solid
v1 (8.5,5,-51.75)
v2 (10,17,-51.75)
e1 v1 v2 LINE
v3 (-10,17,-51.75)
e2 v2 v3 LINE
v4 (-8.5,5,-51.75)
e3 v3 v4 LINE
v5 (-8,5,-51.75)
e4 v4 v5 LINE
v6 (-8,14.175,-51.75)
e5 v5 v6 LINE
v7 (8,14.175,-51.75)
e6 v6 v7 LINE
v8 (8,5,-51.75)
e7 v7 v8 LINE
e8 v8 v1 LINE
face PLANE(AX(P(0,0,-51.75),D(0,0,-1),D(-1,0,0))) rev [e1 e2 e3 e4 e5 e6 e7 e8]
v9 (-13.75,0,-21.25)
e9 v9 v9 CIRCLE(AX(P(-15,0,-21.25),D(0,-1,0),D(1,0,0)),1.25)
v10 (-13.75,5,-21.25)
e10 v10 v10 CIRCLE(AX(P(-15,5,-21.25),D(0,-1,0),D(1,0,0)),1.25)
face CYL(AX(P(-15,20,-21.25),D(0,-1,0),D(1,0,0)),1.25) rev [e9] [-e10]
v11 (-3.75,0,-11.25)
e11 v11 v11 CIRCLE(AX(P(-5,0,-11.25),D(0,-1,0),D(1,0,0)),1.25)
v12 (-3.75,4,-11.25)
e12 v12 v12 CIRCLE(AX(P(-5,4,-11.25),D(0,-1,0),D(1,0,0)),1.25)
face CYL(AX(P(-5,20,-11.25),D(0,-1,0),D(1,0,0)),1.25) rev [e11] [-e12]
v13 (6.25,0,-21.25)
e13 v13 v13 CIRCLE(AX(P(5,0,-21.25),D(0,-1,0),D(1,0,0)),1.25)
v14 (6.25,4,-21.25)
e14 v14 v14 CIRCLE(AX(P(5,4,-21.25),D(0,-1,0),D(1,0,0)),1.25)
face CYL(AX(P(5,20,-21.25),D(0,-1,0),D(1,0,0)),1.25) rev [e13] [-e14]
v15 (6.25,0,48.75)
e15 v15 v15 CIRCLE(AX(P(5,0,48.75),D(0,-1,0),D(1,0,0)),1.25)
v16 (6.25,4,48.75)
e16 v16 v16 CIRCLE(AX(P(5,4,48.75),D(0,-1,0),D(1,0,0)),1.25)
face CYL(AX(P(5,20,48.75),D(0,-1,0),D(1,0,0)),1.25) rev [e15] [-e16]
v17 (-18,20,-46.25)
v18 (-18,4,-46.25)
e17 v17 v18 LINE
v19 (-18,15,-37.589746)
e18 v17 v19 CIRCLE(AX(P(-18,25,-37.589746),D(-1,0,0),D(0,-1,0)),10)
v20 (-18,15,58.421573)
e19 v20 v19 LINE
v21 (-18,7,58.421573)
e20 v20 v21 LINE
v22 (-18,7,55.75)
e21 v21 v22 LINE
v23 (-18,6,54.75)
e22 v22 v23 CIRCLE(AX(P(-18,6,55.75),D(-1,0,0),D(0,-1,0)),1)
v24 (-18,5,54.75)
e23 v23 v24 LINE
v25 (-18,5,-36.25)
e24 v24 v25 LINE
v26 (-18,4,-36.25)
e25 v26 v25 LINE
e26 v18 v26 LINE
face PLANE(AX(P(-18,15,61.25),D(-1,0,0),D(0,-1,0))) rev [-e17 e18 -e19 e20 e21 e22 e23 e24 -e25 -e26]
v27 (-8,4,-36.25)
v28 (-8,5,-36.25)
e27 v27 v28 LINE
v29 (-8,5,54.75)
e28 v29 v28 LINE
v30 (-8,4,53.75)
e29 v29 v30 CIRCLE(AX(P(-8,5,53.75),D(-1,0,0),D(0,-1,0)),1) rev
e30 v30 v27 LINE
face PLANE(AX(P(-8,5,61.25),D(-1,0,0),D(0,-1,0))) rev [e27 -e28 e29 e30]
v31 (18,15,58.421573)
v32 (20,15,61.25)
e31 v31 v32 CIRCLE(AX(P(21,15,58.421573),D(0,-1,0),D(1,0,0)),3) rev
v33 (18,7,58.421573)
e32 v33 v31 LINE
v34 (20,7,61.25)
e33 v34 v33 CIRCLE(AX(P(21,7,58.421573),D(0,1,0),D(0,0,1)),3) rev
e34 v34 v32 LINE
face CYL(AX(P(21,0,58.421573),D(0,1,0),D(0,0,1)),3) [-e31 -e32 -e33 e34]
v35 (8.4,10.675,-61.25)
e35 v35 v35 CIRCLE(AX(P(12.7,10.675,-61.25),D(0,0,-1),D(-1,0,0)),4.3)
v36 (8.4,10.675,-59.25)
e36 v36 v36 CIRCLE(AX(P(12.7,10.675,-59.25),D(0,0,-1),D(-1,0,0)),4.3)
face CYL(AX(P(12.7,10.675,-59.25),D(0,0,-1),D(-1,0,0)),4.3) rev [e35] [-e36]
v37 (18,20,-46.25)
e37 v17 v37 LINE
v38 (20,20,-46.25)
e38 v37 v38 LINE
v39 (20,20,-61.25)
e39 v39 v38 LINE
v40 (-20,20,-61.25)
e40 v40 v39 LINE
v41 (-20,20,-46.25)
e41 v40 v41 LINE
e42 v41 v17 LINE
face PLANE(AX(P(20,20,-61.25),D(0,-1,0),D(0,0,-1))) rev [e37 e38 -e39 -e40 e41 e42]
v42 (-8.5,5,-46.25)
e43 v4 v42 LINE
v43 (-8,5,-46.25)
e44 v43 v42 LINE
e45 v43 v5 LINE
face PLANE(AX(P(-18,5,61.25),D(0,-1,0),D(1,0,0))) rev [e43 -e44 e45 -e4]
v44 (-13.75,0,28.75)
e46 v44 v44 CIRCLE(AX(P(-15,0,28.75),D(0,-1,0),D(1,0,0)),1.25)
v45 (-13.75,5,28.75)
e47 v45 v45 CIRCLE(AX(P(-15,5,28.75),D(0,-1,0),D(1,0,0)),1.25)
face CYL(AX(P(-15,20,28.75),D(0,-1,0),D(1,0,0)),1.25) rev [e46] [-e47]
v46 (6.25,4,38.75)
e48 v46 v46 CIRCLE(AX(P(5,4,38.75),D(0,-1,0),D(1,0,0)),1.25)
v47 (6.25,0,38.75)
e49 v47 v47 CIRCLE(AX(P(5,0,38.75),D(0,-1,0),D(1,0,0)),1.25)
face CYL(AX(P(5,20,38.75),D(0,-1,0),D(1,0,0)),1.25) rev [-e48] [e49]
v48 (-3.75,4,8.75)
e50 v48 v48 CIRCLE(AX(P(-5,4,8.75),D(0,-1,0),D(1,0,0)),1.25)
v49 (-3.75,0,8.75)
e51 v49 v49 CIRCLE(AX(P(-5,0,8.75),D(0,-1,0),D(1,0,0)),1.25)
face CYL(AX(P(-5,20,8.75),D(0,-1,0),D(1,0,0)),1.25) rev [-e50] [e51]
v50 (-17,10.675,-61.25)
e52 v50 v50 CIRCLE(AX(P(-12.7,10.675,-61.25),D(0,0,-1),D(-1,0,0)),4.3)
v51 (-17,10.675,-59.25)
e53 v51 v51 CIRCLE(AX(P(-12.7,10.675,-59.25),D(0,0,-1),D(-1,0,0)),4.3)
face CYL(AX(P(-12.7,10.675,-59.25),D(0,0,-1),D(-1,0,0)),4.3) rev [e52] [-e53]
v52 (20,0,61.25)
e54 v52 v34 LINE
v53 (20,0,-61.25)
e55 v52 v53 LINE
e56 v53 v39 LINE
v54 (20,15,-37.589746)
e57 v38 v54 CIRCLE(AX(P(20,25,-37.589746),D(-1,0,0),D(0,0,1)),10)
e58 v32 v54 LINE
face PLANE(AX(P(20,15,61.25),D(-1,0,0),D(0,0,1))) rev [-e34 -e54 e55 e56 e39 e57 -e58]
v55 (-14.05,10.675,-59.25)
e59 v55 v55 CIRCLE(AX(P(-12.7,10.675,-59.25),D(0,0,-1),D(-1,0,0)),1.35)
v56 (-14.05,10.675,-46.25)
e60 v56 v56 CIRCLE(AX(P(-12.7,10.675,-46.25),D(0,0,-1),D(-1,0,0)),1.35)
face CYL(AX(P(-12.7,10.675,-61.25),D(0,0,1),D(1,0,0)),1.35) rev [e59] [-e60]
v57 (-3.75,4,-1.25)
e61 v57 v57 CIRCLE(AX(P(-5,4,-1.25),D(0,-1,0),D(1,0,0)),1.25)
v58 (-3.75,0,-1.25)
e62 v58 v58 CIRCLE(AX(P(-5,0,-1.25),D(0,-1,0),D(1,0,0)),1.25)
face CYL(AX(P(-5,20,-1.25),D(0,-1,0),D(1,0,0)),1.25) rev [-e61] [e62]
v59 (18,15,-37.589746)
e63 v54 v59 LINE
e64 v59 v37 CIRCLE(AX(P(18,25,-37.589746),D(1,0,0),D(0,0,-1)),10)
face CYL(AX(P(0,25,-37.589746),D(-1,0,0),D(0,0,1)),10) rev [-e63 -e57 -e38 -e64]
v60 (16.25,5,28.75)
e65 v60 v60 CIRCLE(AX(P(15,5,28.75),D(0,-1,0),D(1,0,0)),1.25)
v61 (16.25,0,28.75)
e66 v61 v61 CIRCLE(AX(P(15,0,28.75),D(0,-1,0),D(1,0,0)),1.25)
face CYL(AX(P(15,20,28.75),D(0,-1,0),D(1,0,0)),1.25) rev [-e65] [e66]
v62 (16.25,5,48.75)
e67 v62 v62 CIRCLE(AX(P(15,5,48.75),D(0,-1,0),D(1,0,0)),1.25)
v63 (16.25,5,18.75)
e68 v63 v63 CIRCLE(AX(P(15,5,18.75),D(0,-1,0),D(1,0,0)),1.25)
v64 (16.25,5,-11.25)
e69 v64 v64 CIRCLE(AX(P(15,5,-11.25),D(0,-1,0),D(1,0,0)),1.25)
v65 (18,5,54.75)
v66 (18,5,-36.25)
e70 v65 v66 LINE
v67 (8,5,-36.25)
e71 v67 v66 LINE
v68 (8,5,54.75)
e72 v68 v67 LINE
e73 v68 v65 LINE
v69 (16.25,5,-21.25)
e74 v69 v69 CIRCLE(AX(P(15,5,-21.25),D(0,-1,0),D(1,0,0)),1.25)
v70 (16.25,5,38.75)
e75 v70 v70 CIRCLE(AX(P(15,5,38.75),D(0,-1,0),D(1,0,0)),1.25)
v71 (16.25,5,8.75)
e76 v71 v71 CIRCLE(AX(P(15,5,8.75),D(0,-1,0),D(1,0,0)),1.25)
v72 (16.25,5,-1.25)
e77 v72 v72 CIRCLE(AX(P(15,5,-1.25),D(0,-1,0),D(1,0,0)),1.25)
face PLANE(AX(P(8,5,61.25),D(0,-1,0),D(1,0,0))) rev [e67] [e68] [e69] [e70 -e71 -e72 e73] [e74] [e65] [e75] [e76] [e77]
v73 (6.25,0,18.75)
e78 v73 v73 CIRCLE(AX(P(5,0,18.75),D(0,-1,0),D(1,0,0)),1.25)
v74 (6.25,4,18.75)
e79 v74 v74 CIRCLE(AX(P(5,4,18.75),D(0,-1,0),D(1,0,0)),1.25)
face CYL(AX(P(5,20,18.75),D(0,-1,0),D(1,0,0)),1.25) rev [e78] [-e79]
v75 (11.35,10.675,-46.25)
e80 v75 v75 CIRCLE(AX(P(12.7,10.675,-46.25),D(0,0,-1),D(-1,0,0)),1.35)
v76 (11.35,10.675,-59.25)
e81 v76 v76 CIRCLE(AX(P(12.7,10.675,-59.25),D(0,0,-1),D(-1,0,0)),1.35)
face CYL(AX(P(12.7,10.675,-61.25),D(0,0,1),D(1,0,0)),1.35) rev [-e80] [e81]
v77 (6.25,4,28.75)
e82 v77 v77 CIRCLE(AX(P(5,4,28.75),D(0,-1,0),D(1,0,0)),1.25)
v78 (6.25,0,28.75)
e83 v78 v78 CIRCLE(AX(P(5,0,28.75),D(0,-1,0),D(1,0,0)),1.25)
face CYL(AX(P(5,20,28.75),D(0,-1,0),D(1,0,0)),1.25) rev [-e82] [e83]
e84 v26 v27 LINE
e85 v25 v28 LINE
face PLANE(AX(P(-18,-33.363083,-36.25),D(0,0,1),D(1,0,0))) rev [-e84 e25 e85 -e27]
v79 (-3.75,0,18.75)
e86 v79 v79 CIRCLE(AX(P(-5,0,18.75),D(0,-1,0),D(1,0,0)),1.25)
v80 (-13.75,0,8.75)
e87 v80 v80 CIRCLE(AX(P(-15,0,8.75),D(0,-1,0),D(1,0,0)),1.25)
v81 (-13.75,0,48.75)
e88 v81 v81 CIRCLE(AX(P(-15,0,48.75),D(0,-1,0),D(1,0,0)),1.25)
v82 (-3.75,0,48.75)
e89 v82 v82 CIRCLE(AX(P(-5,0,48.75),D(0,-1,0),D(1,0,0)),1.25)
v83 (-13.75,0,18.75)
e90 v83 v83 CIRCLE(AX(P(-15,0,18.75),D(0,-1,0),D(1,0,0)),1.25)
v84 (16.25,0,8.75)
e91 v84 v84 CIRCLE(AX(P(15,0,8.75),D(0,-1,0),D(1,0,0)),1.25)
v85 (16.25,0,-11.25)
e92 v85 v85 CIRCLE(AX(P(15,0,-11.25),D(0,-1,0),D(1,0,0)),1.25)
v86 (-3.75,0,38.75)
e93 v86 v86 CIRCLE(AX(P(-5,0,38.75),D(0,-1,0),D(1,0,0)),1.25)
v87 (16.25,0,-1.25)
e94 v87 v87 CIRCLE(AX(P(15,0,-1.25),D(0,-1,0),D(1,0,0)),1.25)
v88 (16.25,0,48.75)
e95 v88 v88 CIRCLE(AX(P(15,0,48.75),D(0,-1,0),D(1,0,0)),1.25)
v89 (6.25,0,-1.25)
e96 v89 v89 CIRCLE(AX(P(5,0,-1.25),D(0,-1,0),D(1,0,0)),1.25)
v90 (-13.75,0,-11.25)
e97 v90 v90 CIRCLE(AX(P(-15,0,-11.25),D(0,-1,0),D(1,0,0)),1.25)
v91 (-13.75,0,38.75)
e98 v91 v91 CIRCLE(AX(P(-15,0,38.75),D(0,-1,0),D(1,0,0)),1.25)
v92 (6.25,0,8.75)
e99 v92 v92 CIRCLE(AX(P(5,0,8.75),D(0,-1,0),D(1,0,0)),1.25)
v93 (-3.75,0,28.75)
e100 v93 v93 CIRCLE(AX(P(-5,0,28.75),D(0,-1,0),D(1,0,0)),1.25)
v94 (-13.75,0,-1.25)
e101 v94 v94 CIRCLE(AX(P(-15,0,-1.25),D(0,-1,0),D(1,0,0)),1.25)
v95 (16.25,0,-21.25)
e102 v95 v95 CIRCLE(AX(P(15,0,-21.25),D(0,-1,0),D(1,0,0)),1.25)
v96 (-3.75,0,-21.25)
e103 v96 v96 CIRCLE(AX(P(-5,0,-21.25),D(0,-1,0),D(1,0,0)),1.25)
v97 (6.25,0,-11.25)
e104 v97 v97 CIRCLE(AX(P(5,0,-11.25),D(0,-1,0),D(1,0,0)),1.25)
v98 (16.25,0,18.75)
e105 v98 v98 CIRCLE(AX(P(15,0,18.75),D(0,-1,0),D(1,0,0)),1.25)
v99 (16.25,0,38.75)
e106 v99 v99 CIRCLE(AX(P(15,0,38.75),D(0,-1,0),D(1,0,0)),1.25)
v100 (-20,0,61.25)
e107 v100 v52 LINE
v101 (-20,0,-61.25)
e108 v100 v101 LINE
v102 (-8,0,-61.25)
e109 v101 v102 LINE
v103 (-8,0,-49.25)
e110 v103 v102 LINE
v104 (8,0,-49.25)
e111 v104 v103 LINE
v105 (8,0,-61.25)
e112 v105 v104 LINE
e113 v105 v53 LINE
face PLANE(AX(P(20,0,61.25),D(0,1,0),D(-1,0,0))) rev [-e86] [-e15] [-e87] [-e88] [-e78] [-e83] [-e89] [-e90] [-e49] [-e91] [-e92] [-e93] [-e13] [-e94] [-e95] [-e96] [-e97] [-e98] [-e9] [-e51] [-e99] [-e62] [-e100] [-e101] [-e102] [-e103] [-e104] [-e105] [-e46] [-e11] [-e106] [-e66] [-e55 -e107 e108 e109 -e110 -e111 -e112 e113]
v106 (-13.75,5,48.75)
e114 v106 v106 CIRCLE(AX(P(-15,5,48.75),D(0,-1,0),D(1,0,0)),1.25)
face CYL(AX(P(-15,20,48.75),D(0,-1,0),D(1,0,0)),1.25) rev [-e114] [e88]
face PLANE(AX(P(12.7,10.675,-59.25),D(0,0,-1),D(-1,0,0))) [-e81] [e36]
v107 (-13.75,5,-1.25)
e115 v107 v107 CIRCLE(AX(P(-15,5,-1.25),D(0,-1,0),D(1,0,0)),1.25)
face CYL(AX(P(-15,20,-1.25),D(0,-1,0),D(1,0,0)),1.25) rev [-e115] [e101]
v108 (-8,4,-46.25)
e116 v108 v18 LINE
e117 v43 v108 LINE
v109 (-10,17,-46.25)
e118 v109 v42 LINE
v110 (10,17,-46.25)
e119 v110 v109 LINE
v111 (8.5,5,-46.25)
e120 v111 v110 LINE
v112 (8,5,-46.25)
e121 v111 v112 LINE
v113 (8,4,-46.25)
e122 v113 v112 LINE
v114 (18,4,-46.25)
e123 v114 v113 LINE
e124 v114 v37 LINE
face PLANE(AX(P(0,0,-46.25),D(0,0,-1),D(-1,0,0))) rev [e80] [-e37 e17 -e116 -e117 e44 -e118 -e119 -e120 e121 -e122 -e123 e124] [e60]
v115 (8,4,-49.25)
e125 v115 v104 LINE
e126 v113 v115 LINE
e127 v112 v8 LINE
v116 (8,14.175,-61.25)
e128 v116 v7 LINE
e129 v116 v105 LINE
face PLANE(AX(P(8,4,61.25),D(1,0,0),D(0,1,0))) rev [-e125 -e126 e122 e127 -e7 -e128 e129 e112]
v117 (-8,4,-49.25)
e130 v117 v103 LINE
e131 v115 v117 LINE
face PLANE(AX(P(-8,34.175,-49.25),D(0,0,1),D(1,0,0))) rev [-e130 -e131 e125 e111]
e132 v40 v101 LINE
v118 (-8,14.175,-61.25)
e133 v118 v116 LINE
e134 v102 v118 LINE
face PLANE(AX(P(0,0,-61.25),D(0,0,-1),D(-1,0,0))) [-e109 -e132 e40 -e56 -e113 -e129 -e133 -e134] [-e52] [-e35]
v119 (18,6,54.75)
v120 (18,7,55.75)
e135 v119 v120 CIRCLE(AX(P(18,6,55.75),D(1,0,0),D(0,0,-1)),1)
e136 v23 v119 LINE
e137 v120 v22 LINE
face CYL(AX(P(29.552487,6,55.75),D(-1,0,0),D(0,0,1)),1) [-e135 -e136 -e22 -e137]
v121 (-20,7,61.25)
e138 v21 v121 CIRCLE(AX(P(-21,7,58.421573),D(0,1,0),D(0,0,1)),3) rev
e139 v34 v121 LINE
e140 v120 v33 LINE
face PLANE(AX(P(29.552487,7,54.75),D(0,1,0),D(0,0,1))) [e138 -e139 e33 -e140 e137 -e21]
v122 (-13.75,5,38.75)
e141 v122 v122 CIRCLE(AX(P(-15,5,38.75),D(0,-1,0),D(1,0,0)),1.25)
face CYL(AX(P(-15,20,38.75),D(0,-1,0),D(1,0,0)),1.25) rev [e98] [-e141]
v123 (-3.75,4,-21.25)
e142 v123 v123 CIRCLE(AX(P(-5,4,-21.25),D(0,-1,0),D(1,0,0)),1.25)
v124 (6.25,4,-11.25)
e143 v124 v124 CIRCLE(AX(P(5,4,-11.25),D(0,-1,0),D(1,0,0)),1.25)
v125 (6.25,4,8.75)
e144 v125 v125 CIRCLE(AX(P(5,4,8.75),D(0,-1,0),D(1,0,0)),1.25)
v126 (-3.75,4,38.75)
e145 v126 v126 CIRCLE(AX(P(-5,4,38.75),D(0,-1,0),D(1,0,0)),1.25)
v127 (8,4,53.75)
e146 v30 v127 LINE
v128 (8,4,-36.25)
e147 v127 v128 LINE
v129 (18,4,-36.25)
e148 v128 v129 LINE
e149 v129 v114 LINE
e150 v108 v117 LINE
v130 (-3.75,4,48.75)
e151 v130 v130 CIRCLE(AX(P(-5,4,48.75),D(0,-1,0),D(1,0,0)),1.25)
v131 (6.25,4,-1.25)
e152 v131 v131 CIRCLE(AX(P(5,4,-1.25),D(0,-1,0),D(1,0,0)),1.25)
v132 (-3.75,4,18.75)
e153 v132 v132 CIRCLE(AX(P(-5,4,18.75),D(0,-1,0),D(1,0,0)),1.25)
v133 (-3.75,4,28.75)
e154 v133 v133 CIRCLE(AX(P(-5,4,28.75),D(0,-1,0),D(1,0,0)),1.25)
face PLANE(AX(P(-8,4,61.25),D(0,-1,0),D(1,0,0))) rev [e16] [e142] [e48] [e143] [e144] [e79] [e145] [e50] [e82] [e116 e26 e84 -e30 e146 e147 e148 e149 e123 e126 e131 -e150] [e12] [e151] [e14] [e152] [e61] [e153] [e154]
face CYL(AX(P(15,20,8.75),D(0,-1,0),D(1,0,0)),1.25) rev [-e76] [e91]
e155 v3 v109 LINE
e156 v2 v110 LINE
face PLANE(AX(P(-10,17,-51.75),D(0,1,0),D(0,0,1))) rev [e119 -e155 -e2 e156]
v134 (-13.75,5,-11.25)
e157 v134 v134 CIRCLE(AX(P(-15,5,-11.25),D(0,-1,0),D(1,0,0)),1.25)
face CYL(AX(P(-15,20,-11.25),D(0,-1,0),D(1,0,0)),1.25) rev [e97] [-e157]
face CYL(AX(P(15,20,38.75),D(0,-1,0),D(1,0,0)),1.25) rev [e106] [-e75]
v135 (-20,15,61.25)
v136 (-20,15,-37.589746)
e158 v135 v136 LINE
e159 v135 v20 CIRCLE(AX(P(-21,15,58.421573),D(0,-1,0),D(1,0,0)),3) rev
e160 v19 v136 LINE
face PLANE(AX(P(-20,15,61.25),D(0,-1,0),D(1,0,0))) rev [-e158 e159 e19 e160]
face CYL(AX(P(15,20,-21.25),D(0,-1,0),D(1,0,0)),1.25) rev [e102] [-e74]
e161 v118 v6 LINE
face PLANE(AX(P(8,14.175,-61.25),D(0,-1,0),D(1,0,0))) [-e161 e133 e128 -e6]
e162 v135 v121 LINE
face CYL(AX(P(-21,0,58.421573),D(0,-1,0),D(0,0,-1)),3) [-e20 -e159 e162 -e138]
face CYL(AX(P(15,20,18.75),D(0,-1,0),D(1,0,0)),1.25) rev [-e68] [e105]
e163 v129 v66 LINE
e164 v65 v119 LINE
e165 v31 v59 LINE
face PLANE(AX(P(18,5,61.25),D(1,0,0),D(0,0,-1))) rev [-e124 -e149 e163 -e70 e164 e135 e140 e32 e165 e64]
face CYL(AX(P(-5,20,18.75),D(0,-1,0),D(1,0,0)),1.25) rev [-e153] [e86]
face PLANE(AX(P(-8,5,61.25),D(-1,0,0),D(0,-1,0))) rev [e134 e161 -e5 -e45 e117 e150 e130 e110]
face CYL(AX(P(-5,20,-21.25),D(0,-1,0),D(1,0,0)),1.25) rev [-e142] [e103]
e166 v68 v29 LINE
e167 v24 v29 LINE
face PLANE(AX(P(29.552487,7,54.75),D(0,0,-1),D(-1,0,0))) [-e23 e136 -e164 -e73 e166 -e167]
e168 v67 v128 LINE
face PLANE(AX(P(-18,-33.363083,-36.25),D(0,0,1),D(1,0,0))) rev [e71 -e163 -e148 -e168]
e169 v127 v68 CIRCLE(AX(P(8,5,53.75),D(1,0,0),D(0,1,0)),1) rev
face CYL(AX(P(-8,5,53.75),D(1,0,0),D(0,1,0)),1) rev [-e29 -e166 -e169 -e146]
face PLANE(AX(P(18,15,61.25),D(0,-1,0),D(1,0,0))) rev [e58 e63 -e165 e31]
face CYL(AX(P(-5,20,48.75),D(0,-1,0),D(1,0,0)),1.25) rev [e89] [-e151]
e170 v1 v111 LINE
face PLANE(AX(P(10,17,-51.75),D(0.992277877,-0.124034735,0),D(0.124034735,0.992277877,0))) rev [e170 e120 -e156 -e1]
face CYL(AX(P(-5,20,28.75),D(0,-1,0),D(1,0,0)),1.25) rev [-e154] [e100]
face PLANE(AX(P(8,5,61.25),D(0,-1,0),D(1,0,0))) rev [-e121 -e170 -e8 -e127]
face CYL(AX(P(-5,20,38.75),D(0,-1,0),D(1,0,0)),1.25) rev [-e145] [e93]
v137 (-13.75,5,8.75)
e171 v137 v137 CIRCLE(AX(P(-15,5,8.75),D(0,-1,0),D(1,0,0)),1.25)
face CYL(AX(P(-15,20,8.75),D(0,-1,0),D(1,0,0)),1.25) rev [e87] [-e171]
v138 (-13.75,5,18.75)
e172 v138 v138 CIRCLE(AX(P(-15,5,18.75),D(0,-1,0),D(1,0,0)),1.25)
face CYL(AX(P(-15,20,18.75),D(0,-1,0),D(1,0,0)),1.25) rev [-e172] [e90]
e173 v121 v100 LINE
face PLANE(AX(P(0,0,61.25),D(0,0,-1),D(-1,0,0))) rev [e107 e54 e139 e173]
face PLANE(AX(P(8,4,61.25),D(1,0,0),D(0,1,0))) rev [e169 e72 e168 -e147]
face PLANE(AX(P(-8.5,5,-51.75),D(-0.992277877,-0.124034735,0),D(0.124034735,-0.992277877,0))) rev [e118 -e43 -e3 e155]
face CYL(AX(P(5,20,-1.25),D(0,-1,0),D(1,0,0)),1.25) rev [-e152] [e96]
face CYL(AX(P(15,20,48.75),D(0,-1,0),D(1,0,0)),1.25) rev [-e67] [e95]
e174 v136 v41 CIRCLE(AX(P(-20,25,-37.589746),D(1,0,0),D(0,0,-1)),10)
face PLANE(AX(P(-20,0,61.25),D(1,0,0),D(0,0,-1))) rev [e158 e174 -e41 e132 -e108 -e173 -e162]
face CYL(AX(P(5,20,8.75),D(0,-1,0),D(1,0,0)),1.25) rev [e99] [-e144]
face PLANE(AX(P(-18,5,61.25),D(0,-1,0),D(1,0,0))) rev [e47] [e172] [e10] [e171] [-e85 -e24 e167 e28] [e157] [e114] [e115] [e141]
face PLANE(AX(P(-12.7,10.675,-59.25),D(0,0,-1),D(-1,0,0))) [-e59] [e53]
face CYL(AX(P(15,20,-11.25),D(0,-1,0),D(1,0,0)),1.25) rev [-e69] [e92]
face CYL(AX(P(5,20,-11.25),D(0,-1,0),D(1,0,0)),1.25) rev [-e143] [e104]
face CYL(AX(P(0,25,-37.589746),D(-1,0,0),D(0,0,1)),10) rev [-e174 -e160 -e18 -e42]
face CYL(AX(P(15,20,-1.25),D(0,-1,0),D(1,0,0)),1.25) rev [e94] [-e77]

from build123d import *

# Parameters (mm, degrees)
MAIN_DEPTH                      = 61.25
FRONT_CONGE_R                   = 3
ESQUISSE11_W                    = 2
ESQUISSE11_H                    = 15
DSUB_EXTRUSION_ATTACHMENT_DEPTH = 15
ESQUISSE12_W                    = 40
ESQUISSE12_H                    = 15
ESQUISSE12_R                    = 1.35
ESQUISSE12_W_2                  = 16
ESQUISSE12_H_2                  = 7
DSUB_EXTRUSION_DEPTH            = 15
DSUB_FRONT_HOLE_DEPTH           = 5.5
ESQUISSE14_R                    = 4.3
BOTTOM_HOLE_DEPTH               = 2
SKETCH7_W                       = 36
SKETCH7_H                       = 10
DSUBBOTTOMHOLE_DEPTH            = 1
CONG_4_R                        = 10
BOTTOMSTOP_REACH                = 77.839
SKETCH4_W                       = 6.5
SKETCH4_H                       = 7
FILLET1_R                       = 1
SKETCH5_W                       = 16
SKETCH5_H                       = 12
CUT_EXTRUDE1_DEPTH              = 14.175
SKETCH6_R                       = 1.25
FIXHOLE_DEPTH                   = 68.465268843
LPATTERN1_COUNT                 = 8
LPATTERN1_PITCH                 = 10
LPATTERN1_COUNT_DIR2            = 4
LPATTERN1_PITCH_DIR2            = 10


with BuildPart() as part:
    # Esquisse1 → Main (new, symmetric)
    with BuildSketch(Plane.XY):
        Polygon((18, 15), (20, 15), (20, 0), (-20, 0), (-20, 15), (-18, 15), (-18, 5), (-8, 5), (-8, 4), (8, 4), (8, 5), (18, 5), align=None)
    extrude(amount=MAIN_DEPTH, both=True)

    # Front Conge
    # the kernel refuses this fillet: 3 mm, written as the material it takes off along each edge
    with BuildSketch(Plane(origin=(18, 5, 61.25), x_dir=(1, 0, 0), z_dir=(0, 1, 0)), Plane(origin=(-18, 22.071067812, 61.25), x_dir=(-1, 0, 0), z_dir=(0, -1, 0))) as front_conge_piece_1:
        with BuildLine():
            CenterArc((3, 2.828427125), FRONT_CONGE_R, 180, 70.528779366)
            Line((0, 2.828427125), (-0.06, 2.828427125))
            Line((-0.06, 2.828427125), (-0.06, 0))
            Line((-0.06, 0), (0, -0.06))
            ThreePointArc((0, -0.06), (1, -0.06), (1.98, -0.056568542))
            Line((1.98, -0.056568542), (2, 0))
        make_face()
    extrude(amount=17.071067812, mode=Mode.SUBTRACT)

    # Esquisse11 → DSub-Extrusion Attachment (add)
    with BuildSketch(Plane(origin=(0, 0, -46.25), x_dir=(-1, 0, 0), z_dir=(0, 0, -1))):
        with Locations((-19, 12.5)):
            Rectangle(ESQUISSE11_W, ESQUISSE11_H)
        with Locations((19, 12.5)):
            Rectangle(ESQUISSE11_W, ESQUISSE11_H)
    extrude(amount=DSUB_EXTRUSION_ATTACHMENT_DEPTH)

    # Esquisse12 → DSub-Extrusion (add)
    with BuildSketch(Plane(origin=(0, 0, -46.25), x_dir=(-1, 0, 0), z_dir=(0, 0, -1))):
        with Locations((0, 12.5)):
            Rectangle(ESQUISSE12_W, ESQUISSE12_H)
        with Locations((-12.7, 10.675)):
            Circle(ESQUISSE12_R, mode=Mode.SUBTRACT)
        with Locations((12.7, 10.675)):
            Circle(ESQUISSE12_R, mode=Mode.SUBTRACT)
        with Locations((0, 10.675)):
            Rectangle(ESQUISSE12_W_2, ESQUISSE12_H_2, mode=Mode.SUBTRACT)
    extrude(amount=DSUB_EXTRUSION_DEPTH)

    # Esquisse13 → DSub-Front Hole (cut)
    with BuildSketch(Plane.XY.offset(-46.25)):
        Polygon((-10, 17), (10, 17), (8.5, 5), (-8.5, 5), align=None)
    extrude(amount=-DSUB_FRONT_HOLE_DEPTH, mode=Mode.SUBTRACT)

    # Esquisse14 → Bottom Hole (cut)
    with BuildSketch(Plane(origin=(0, 0, -61.25), x_dir=(-1, 0, 0), z_dir=(0, 0, -1))):
        with Locations((-12.7, 10.675)):
            Circle(ESQUISSE14_R)
        with Locations((12.7, 10.675)):
            Circle(ESQUISSE14_R)
    extrude(amount=-BOTTOM_HOLE_DEPTH, mode=Mode.SUBTRACT)

    # Sketch7 → DSubBottomHole (cut)
    with BuildSketch(Plane(origin=(0, 5, 0), x_dir=(1, 0, 0), z_dir=(0, 1, 0))):
        with Locations((0, 41.25)):
            Rectangle(SKETCH7_W, SKETCH7_H)
    extrude(amount=-DSUBBOTTOMHOLE_DEPTH, mode=Mode.SUBTRACT)

    # Congé4
    # the kernel refuses this fillet: 10 mm, written as the material it adds along each edge
    with BuildSketch(Plane(origin=(-18, 15, -46.25), x_dir=(0, 1, 0), z_dir=(-1, 0, 0)), Plane(origin=(20, 15, -46.25), x_dir=(0, 1, 0), z_dir=(-1, 0, 0))) as cong_4_piece_1:
        with BuildLine():
            CenterArc((10, -8.660254038), CONG_4_R, 120, 60)
            Line((0, -8.660254038), (0, 0))
            Line((0, 0), (5, 0))
        make_face()
    extrude(amount=2)

    # BottomStop: up to this face of the body (flat: up to its plane)
    bottomstop_end = Plane(part.part.faces().sort_by_distance((20, 7.947826544, -2.383218252))[0])
    # Sketch4 → BottomStop (add, up to the picked face)
    with BuildSketch(Plane.ZY.offset(20), mode=Mode.PRIVATE) as bottomstop_sk1:
        with Locations((58, 3.5)):
            Rectangle(SKETCH4_W, SKETCH4_H)
    bottomstop_tool1 = split(extrude(bottomstop_sk1.sketch, amount=-BOTTOMSTOP_REACH, mode=Mode.PRIVATE), bisect_by=bottomstop_end, keep=Keep.BOTH, mode=Mode.PRIVATE)
    add(bottomstop_tool1.solids().sort_by(Axis((-20, 3.5, 58), (1, 0, 0)))[0])

    # Fillet1
    fillet1_edges = [part.edges().sort_by_distance(p)[0] for p in [
        (0, 4, 54.75),
        (0, 7, 54.75),
    ]]
    fillet(fillet1_edges, radius=FILLET1_R)

    # Sketch5 → Cut-Extrude1 (cut)
    with BuildSketch(Plane(origin=(0, 0, 0), x_dir=(-1, 0, 0), z_dir=(0, -1, 0))):
        with Locations((0, 55.25)):
            Rectangle(SKETCH5_W, SKETCH5_H)
    extrude(amount=-CUT_EXTRUDE1_DEPTH, mode=Mode.SUBTRACT)

    # Sketch6 → FixHole (cut, through all)
    with BuildSketch(Plane(origin=(0, 0, 0), x_dir=(-1, 0, 0), z_dir=(0, -1, 0))):
        with Locations(Location((15, -48.75, 0), (0, 0, 180))):
            Circle(SKETCH6_R)
    fixhole = extrude(amount=-FIXHOLE_DEPTH, mode=Mode.SUBTRACT)

    # LPattern1: FixHole 8 × 4
    with Locations(*[(j * LPATTERN1_PITCH_DIR2, 0, -i * LPATTERN1_PITCH) for i in range(LPATTERN1_COUNT) for j in range(LPATTERN1_COUNT_DIR2) if (i, j) != (0, 0)]):
        add(fixhole, mode=Mode.SUBTRACT)


solid = part.part
